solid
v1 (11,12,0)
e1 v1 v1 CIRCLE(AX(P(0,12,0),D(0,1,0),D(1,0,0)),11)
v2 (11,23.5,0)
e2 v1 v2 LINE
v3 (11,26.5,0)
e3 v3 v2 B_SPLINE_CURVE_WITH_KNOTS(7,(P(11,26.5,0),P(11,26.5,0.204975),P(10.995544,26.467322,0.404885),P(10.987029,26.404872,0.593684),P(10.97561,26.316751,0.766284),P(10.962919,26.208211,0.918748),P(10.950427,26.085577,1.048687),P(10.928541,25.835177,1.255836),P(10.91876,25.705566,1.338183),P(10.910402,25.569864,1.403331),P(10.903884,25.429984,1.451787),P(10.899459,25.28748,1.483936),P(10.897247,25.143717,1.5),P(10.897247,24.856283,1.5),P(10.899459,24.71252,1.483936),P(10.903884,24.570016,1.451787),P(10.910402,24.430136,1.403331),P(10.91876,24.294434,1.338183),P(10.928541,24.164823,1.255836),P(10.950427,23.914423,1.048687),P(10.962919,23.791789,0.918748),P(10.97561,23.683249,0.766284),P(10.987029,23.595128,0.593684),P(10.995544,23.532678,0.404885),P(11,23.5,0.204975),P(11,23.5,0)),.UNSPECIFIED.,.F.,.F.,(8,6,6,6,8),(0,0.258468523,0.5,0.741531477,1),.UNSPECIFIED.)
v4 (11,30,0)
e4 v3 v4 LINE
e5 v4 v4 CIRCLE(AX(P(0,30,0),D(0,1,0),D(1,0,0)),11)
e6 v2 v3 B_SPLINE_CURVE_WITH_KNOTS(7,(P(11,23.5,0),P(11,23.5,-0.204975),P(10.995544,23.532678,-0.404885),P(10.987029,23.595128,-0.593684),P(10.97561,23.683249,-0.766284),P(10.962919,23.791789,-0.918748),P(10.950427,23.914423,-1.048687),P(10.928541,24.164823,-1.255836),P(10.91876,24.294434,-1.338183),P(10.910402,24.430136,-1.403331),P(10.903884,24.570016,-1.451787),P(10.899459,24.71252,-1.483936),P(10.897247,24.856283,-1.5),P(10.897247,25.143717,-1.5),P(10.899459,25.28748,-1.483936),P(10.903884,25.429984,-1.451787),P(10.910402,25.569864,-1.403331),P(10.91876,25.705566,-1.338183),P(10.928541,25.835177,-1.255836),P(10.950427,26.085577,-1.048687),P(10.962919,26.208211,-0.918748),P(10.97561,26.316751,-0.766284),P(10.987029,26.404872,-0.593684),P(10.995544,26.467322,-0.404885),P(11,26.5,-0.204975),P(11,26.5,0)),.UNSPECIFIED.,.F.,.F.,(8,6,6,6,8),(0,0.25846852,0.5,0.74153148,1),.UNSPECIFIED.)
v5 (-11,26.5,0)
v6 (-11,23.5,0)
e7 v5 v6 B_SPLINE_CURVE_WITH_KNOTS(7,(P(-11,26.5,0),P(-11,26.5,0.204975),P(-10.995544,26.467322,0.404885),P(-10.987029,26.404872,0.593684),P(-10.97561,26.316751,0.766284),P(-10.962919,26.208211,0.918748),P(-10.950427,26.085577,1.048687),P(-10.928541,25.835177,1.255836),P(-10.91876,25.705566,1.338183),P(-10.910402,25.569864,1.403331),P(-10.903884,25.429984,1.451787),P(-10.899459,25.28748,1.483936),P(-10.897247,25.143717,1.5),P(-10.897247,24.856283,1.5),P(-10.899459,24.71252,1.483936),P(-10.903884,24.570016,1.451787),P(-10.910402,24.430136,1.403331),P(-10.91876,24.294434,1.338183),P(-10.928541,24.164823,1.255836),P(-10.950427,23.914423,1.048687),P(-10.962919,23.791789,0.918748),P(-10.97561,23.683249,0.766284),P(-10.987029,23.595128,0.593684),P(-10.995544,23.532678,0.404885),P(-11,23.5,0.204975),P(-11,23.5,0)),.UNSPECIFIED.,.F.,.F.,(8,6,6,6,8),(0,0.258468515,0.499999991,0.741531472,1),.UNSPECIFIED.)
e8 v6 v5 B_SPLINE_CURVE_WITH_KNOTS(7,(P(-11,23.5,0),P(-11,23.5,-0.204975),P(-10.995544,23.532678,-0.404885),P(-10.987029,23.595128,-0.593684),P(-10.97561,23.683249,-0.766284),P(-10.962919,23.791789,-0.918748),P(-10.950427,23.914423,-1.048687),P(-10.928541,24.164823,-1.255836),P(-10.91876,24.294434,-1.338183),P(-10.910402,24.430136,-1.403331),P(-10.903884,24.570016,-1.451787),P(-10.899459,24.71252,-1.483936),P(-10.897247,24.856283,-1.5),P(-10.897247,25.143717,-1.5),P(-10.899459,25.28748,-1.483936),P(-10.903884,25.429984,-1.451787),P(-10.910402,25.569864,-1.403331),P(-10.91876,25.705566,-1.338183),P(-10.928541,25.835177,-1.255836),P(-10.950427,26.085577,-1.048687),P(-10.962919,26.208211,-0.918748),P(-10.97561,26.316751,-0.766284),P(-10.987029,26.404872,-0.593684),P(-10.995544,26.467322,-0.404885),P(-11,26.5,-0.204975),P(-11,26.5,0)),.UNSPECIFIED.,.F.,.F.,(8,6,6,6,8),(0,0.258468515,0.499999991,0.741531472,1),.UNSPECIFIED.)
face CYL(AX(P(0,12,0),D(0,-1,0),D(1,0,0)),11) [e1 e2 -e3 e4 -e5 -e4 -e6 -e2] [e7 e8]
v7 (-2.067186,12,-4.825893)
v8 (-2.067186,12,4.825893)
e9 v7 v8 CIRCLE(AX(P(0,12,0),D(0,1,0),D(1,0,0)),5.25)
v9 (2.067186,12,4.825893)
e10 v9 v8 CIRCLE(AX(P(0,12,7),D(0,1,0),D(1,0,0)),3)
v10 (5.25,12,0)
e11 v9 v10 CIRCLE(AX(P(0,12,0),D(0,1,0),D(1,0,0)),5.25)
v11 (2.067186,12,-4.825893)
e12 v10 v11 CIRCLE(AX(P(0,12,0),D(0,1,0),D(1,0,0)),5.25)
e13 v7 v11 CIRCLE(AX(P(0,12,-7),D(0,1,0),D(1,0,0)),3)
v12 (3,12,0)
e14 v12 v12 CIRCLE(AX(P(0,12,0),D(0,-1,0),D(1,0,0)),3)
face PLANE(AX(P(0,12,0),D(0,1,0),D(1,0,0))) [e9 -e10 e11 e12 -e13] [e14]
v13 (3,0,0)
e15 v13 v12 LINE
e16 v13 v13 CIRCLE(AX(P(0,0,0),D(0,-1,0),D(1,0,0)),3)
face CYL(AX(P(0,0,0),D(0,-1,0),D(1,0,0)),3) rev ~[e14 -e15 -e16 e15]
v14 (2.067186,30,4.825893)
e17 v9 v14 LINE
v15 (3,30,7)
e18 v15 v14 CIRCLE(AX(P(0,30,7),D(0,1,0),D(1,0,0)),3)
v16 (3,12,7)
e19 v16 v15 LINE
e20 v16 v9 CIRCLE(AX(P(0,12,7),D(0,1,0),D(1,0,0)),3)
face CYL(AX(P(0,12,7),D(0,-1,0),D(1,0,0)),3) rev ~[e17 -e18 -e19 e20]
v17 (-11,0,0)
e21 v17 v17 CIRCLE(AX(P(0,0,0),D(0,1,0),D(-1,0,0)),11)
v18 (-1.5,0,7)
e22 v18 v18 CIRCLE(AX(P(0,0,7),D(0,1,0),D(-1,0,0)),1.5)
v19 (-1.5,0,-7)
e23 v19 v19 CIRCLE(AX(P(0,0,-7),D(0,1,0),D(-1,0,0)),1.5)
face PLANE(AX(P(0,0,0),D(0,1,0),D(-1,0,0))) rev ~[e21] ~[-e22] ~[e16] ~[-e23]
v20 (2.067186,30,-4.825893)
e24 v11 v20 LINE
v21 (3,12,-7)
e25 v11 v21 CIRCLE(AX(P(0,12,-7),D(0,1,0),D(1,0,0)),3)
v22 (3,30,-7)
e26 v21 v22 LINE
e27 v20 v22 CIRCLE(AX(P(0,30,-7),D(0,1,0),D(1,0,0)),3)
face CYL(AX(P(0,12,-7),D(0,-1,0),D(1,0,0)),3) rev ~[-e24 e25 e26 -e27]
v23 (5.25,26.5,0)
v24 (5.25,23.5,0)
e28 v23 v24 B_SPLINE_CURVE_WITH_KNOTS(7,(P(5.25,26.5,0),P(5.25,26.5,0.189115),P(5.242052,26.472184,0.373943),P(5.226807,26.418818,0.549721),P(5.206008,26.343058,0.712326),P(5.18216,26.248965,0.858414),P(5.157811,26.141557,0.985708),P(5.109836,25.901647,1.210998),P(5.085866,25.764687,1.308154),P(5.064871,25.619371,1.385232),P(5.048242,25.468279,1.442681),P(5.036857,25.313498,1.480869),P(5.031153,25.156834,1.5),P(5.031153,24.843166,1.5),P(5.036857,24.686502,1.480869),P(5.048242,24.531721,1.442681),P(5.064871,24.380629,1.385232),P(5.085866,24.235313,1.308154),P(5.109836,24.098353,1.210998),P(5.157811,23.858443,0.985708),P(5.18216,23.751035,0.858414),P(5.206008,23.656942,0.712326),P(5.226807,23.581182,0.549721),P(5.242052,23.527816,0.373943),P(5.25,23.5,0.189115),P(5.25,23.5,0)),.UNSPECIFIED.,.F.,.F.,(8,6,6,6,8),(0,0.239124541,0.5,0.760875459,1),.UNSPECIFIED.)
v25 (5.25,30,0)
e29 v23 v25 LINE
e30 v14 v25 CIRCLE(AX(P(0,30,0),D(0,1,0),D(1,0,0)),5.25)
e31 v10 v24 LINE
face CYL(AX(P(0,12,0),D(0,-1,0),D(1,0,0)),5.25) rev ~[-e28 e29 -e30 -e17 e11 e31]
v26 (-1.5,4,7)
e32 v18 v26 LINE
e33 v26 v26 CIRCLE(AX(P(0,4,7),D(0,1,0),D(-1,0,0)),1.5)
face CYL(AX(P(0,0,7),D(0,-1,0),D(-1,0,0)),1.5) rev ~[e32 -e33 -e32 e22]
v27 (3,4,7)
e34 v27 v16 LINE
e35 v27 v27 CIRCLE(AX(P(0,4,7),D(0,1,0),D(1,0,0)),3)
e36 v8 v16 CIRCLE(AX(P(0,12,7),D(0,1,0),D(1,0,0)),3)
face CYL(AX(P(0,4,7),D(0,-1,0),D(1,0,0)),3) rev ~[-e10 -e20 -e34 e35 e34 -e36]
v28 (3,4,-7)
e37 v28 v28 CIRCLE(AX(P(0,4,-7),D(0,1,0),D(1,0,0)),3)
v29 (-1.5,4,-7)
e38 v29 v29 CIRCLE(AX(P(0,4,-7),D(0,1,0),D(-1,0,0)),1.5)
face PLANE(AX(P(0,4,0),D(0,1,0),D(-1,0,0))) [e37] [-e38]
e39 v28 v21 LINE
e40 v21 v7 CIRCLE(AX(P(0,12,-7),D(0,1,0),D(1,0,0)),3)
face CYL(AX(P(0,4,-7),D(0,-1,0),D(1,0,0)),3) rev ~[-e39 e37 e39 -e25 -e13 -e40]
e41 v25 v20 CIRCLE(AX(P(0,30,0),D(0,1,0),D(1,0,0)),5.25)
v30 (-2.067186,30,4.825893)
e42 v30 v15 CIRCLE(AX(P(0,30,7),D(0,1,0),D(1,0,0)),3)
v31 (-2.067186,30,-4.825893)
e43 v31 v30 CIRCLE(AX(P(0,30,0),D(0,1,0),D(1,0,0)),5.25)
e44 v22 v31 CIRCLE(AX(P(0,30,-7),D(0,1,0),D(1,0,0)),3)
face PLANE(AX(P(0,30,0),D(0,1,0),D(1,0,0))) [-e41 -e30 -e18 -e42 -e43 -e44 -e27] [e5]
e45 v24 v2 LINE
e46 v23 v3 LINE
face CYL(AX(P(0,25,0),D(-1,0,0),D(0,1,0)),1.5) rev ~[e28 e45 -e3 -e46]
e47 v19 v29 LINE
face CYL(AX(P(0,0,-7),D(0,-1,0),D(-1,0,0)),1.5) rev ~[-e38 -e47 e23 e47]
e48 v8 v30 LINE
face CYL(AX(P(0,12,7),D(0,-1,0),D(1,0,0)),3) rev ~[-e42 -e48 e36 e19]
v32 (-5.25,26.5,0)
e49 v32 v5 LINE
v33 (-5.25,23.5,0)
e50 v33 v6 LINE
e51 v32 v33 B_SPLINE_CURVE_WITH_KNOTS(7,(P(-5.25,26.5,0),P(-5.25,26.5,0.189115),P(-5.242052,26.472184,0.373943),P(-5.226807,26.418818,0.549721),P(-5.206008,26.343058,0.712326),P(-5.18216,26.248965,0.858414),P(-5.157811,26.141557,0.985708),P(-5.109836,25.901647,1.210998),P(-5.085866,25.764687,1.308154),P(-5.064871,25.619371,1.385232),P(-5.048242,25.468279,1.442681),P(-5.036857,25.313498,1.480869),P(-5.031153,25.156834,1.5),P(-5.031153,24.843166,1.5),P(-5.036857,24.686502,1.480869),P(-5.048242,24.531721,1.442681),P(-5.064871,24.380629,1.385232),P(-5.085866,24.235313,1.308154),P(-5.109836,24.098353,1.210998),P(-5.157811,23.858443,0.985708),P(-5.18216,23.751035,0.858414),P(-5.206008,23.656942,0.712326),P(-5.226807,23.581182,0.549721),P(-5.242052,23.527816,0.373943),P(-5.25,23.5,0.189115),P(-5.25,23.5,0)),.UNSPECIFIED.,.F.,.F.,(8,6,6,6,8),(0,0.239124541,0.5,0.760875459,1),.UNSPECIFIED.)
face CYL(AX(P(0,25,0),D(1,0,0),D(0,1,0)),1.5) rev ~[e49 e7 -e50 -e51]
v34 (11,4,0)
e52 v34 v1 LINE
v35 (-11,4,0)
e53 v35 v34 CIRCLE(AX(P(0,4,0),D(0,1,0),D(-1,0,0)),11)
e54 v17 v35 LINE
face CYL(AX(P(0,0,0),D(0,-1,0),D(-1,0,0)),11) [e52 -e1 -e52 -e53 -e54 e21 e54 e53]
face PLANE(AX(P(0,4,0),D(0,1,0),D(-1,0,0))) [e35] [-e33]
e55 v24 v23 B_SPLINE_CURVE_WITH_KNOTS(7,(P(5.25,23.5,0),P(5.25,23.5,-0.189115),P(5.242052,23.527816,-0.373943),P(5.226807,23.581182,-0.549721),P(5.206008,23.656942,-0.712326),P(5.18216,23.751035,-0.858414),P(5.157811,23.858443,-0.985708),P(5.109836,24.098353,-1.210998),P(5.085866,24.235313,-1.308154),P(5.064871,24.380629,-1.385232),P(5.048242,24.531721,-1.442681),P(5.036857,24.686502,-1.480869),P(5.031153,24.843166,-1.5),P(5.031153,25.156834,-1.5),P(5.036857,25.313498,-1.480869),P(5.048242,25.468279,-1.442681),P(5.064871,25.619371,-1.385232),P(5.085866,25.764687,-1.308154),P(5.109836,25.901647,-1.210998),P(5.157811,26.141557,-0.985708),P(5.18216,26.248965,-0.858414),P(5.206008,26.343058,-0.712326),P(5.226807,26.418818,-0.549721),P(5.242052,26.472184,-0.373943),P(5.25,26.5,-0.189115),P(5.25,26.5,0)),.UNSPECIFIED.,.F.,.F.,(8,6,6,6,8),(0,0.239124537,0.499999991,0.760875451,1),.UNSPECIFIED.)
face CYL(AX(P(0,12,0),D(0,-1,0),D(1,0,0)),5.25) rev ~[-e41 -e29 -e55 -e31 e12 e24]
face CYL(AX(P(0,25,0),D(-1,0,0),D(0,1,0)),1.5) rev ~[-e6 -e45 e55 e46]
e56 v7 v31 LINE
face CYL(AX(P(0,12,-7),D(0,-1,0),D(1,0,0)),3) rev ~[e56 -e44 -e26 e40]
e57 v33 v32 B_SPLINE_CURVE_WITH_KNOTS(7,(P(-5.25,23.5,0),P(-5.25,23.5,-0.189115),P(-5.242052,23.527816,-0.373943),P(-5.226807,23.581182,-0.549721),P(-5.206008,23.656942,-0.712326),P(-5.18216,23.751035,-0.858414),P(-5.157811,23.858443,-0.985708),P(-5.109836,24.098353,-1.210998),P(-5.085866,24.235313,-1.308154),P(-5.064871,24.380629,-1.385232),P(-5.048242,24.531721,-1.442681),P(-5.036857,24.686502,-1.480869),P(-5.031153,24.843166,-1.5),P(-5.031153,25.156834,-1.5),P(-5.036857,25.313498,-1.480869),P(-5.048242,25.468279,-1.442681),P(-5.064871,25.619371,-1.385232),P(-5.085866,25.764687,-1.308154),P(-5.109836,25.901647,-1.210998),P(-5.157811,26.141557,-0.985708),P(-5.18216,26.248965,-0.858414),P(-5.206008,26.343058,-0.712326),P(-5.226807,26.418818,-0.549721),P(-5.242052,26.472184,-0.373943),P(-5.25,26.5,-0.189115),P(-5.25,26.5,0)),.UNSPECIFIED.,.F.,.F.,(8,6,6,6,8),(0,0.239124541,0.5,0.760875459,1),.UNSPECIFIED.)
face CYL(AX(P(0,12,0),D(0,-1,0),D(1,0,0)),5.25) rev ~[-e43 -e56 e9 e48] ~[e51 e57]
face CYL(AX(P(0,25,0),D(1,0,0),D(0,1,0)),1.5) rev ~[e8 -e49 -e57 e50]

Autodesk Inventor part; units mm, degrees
ref_plane "YZ Plane" through (0, 0, 0) normal (1, 0, 0) x (0, 1, 0)
ref_plane "XZ Plane" through (0, 0, 0) normal (0, 1, 0) x (-1, 0, 0)
ref_plane "XY Plane" through (0, 0, 0) normal (0, 0, 1) x (1, 0, 0)
sketch "Boceto5" plane through (0, 0, 0) normal (0, 1, 0) x (-1, 0, 0)
  circle A0 centre (0, 0) radius 11
  line L0 (0, 0) -> (0, -7)
  line L1 (0, 0) -> (0, 7)
  circle A1 centre (0, 7) radius 1.5
  circle A2 centre (0, -7) radius 1.5
  dimension "d25" = 22
  dimension "d26" = 7
  dimension "d27" = 7
  dimension "d28" = 3
  dimension "d29" = 3
extrude "Extrusión6" add sketch "Boceto5" along normal blind 4
sketch "Boceto6" plane through (0, 4, 0) normal (0, 1, 0) x (1, 0, 0)
  circle A0 centre (0, 0) radius 11
  circle A1 centre (0, -7) radius 1.5 projected
  circle A2 centre (0, -7) radius 3
  circle A3 centre (0, 7) radius 1.5 projected
  circle A4 centre (0, 7) radius 3
  dimension "d32" = 6
  dimension "d33" = 6
extrude "Extrusión7" add sketch "Boceto6" along normal blind 8 contours A0
sketch "Boceto7" plane through (0, 12, 0) normal (0, 1, 0) x (1, 0, 0)
  circle A0 centre (0, 0) radius 5.25
  circle A1 centre (0, -7) radius 3 projected
  circle A2 centre (0, -7) radius 3
  circle A3 centre (0, 7) radius 1.5 projected
  circle A4 centre (0, 7) radius 3
  circle A5 centre (0, 0) radius 11
  dimension "d36" = 10.5
extrude "Extrusión8" add sketch "Boceto7" along normal blind 20 contours A5
sketch "Boceto8" plane through (0, 0, 0) normal (1, 0, 0) x (0, 1, 0)
  line L0 (0, 0) -> (23, 0)
  line L1 (23, 0) -> (25, 0)
  circle A0 centre (25, 0) radius 1.5
  dimension "d39" = 23
  dimension "d43" = 2
  dimension "d44" = 3
extrude "Extrusión10" cut sketch "Boceto8" along normal mid plane 22
move faces "Desplazar2" translate (0, -2, 0) faces at (5.0629, 32, -5.6904)
sketch "Boceto9" plane through (0, 0, 0) normal (0, -1, 0) x (1, 0, 0)
  circle A0 centre (0, 0) radius 3
  dimension "d52" = 6
extrude "Extrusión11" cut sketch "Boceto9" against normal blind 12
properties part number "end_effector_connector_arm2_grande"
